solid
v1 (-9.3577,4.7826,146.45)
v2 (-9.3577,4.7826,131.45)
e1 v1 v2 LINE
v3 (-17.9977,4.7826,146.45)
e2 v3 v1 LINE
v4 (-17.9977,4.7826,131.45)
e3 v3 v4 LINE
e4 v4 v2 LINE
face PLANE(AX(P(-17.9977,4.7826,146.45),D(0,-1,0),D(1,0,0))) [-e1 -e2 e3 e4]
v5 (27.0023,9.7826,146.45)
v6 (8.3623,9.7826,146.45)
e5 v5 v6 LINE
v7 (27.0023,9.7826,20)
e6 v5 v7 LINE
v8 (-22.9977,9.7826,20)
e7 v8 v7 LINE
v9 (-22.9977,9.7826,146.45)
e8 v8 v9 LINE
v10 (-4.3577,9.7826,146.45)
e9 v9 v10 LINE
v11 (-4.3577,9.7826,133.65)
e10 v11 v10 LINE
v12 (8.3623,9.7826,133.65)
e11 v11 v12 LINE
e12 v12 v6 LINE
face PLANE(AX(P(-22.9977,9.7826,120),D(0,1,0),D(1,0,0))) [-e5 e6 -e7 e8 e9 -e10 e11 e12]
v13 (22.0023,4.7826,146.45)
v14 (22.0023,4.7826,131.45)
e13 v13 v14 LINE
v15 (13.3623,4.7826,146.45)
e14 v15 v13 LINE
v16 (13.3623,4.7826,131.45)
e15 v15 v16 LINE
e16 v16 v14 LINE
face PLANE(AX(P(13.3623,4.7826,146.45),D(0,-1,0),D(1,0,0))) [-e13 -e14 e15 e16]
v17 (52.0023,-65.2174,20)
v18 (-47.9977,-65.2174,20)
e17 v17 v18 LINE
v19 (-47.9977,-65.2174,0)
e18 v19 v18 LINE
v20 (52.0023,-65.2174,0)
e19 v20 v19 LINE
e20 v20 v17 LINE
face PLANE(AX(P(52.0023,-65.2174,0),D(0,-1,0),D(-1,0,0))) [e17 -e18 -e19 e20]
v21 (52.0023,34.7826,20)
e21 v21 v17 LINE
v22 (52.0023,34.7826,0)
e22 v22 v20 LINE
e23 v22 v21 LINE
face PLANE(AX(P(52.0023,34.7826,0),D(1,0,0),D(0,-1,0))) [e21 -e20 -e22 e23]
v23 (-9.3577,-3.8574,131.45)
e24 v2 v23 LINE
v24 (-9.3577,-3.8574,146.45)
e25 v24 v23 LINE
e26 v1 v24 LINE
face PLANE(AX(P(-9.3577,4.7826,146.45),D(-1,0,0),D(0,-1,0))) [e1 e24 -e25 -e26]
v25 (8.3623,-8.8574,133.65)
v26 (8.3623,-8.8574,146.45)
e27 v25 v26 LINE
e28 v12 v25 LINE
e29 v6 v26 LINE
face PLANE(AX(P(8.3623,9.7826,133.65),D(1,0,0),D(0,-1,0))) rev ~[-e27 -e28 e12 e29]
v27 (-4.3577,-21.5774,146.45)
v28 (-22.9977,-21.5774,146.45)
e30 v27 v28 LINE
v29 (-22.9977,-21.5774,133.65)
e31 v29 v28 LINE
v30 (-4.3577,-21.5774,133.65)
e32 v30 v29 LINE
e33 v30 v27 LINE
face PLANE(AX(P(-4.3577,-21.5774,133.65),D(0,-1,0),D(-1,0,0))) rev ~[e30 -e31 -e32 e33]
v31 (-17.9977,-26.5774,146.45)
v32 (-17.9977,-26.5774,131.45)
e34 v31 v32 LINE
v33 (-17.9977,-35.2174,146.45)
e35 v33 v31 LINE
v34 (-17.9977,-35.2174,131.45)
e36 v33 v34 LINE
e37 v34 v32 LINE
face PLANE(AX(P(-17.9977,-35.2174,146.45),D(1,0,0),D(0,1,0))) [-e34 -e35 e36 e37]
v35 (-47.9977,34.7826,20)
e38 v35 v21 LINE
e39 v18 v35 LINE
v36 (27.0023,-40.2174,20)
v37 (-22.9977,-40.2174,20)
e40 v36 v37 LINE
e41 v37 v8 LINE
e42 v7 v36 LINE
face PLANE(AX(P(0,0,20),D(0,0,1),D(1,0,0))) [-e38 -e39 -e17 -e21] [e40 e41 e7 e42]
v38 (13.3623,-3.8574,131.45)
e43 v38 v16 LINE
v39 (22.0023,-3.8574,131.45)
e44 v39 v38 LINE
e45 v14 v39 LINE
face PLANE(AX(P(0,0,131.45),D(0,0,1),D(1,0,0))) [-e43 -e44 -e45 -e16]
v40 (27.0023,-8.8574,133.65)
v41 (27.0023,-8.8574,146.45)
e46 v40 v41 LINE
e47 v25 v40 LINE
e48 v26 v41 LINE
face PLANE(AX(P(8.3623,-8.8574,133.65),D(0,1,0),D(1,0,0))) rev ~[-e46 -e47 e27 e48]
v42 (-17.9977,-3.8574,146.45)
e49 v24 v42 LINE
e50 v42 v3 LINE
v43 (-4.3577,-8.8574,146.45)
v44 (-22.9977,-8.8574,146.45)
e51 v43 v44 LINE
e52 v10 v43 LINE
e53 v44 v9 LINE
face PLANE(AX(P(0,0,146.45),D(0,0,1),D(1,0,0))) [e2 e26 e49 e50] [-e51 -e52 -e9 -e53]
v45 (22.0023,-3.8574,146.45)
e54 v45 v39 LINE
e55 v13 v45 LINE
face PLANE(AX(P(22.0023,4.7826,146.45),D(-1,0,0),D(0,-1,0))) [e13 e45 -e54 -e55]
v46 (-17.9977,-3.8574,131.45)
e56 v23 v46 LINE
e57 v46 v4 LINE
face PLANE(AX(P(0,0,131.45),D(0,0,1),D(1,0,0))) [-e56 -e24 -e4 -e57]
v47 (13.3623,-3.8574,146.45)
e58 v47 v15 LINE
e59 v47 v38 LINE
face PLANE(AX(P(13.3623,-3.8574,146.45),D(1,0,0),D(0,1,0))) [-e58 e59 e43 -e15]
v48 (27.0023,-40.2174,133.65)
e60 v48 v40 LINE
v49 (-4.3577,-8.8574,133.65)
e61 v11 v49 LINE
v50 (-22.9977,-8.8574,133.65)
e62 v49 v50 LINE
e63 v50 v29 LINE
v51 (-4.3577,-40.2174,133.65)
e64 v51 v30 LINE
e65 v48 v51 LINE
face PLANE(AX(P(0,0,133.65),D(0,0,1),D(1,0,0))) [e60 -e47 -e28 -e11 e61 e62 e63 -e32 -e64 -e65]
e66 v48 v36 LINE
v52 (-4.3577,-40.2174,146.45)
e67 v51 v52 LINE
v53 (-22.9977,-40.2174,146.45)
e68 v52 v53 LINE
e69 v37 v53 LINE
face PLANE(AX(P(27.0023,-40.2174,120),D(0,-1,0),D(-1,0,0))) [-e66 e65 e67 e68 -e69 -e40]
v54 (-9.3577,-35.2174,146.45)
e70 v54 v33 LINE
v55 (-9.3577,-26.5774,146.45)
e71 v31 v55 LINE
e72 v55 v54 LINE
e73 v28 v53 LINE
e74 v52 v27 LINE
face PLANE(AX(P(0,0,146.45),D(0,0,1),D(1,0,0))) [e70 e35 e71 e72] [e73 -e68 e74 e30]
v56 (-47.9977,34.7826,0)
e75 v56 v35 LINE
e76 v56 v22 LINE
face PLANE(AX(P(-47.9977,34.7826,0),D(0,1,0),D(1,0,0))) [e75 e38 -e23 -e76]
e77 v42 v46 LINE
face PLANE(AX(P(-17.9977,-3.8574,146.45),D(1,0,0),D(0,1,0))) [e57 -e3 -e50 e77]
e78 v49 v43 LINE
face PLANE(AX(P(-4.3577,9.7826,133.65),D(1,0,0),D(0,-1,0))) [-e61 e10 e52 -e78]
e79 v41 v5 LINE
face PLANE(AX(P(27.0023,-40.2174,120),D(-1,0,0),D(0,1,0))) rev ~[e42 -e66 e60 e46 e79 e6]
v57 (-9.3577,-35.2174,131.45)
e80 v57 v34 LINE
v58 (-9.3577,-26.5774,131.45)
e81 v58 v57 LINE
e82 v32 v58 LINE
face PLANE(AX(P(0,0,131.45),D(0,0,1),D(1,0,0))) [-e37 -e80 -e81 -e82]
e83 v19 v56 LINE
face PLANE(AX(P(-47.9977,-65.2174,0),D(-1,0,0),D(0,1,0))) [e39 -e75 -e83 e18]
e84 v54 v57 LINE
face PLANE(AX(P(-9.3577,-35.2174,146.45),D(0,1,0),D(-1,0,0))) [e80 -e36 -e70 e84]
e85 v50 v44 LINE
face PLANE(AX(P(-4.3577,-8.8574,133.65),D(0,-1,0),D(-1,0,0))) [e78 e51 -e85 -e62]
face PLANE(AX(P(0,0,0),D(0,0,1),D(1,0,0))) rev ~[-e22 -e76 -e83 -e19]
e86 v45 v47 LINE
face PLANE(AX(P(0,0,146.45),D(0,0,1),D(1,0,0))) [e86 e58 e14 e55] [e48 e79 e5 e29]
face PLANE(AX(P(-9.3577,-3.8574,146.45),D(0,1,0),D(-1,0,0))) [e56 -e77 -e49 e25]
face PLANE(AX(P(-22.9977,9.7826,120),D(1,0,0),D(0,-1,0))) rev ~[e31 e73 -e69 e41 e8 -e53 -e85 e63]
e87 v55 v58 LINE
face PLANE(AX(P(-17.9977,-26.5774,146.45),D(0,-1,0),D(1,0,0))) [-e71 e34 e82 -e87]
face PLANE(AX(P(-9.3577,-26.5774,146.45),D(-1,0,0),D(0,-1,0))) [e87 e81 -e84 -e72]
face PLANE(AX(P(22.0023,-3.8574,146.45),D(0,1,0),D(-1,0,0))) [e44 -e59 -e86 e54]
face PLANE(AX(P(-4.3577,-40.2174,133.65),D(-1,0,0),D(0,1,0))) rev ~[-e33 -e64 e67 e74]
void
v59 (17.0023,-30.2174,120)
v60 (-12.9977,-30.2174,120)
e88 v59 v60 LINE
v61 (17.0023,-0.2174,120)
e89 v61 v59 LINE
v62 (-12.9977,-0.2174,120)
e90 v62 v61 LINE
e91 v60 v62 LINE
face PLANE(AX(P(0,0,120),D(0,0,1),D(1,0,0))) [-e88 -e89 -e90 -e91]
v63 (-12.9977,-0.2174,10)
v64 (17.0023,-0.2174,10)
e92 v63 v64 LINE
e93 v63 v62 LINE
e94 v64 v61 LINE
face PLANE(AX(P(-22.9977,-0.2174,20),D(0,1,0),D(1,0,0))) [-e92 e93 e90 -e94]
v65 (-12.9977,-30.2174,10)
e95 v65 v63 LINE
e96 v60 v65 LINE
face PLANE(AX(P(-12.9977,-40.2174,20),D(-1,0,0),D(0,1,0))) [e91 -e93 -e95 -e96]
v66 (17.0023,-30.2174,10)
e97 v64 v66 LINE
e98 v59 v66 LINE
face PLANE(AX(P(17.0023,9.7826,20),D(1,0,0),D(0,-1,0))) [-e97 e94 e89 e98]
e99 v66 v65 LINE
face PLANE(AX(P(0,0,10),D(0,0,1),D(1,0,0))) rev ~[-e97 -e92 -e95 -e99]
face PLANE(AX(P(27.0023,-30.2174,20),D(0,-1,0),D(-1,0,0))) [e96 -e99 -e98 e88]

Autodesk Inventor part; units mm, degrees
ref_plane "YZ Plane" through (0, 0, 0) normal (1, 0, 0) x (0, 1, 0)
ref_plane "XZ Plane" through (0, 0, 0) normal (0, 1, 0) x (-1, 0, 0)
ref_plane "XY Plane" through (0, 0, 0) normal (0, 0, 1) x (1, 0, 0)
sketch "Sketch1" plane through (0, 0, 0) normal (0, 0, 1) x (1, 0, 0)
  line L0 (-47.9977, 34.7826) -> (52.0023, 34.7826)
  line L1 (52.0023, 34.7826) -> (52.0023, -65.2174)
  line L2 (52.0023, -65.2174) -> (-47.9977, -65.2174)
  line L3 (-47.9977, -65.2174) -> (-47.9977, 34.7826)
  point P0 (0, 0)
  dimension "d0" = 100
  dimension "d1" = 100
  dimension "d2" = 100
extrude "Extrusion1" add sketch "Sketch1" along normal blind 20
sketch "Sketch2" plane through (0, 0, 20) normal (0, 0, 1) x (1, 0, 0)
  line L0 (-22.9977, 9.7826) -> (27.0023, 9.7826)
  line L1 (27.0023, 9.7826) -> (27.0023, -40.2174)
  line L2 (27.0023, -40.2174) -> (-22.9977, -40.2174)
  line L3 (-22.9977, -40.2174) -> (-22.9977, 9.7826)
  line L4 (52.0023, 34.7826) -> (-47.9977, 34.7826) projected
  line L5 (-47.9977, 34.7826) -> (-47.9977, -65.2174) projected
  line L6 (-47.9977, -65.2174) -> (52.0023, -65.2174) projected
  line L7 (52.0023, -65.2174) -> (52.0023, 34.7826) projected
  point P0 (0, 0)
  dimension "d5" = 25
  dimension "d6" = 25
  dimension "d7" = 25
  dimension "d8" = 25
extrude "Extrusion2" add sketch "Sketch2" along normal blind 100 contours L0 L1 L2 L3
shell "Shell1" thickness 10 removed faces 1 at (-6.331, -6.8841, 120)
sketch "Sketch3" plane through (0, 0, 120) normal (0, 0, 1) x (1, 0, 0)
  line L0 (-22.9977, 9.7826) -> (-22.9977, -40.2174) projected
  line L1 (27.0023, -40.2174) -> (27.0023, 9.7826) projected
  line L2 (-22.9977, 9.7826) -> (27.0023, 9.7826)
  line L3 (27.0023, 9.7826) -> (27.0023, -40.2174)
  line L4 (27.0023, -40.2174) -> (-22.9977, -40.2174)
  line L5 (-22.9977, -40.2174) -> (-22.9977, 9.7826)
  point P0 (0, 0)
extrude "Extrusion3" add sketch "Sketch3" along normal blind 13.65
sketch "Sketch4" plane through (0, 0, 133.65) normal (0, 0, 1) x (1, 0, 0)
  line L0 (-22.9977, 9.7826) -> (-4.3577, 9.7826)
  line L1 (-4.3577, 9.7826) -> (-4.3577, -8.8574)
  line L2 (-4.3577, -8.8574) -> (-22.9977, -8.8574)
  line L3 (-22.9977, -8.8574) -> (-22.9977, 9.7826)
  line L4 (27.0023, 9.7826) -> (8.3623, 9.7826)
  line L5 (8.3623, 9.7826) -> (8.3623, -8.8574)
  line L6 (8.3623, -8.8574) -> (27.0023, -8.8574)
  line L7 (27.0023, -8.8574) -> (27.0023, 9.7826)
  line L8 (27.0023, -40.2174) -> (-22.9977, -40.2174) projected
  line L9 (-22.9977, -40.2174) -> (-4.3577, -40.2174)
  line L10 (-4.3577, -40.2174) -> (-4.3577, -21.5774)
  line L11 (-4.3577, -21.5774) -> (-22.9977, -21.5774)
  line L12 (-22.9977, -21.5774) -> (-22.9977, -40.2174)
  point P0 (0, 0)
  dimension "d14" = 18.64
  dimension "d15" = 18.64
  dimension "d16" = 18.64
  dimension "d17" = 18.64
  dimension "d18" = 18.64
extrude "Extrusion4" add sketch "Sketch4" along normal blind 12.8
sketch "Sketch5" plane through (0, 0, 146.45) normal (0, 0, 1) x (1, 0, 0)
  line L0 (13.3623, 4.7826) -> (22.0023, 4.7826)
  line L1 (22.0023, 4.7826) -> (22.0023, -3.8574)
  line L2 (22.0023, -3.8574) -> (13.3623, -3.8574)
  line L3 (13.3623, -3.8574) -> (13.3623, 4.7826)
  line L4 (-17.9977, 4.7826) -> (-9.3577, 4.7826)
  line L5 (-9.3577, 4.7826) -> (-9.3577, -3.8574)
  line L6 (-9.3577, -3.8574) -> (-17.9977, -3.8574)
  line L7 (-17.9977, -3.8574) -> (-17.9977, 4.7826)
  line L8 (-17.9977, -26.5774) -> (-9.3577, -26.5774)
  line L9 (-9.3577, -26.5774) -> (-9.3577, -35.2174)
  line L10 (-9.3577, -35.2174) -> (-17.9977, -35.2174)
  line L11 (-17.9977, -35.2174) -> (-17.9977, -26.5774)
  line L12 (-4.3577, 9.7826) -> (-22.9977, 9.7826) projected
  line L13 (-22.9977, 9.7826) -> (-22.9977, -8.8574) projected
  line L14 (-22.9977, -8.8574) -> (-4.3577, -8.8574) projected
  line L15 (-4.3577, -8.8574) -> (-4.3577, 9.7826) projected
  line L16 (27.0023, 9.7826) -> (8.3623, 9.7826) projected
  line L17 (27.0023, -8.8574) -> (27.0023, 9.7826) projected
  line L18 (8.3623, 9.7826) -> (8.3623, -8.8574) projected
  line L19 (-4.3577, -21.5774) -> (-22.9977, -21.5774) projected
  line L20 (-22.9977, -40.2174) -> (-4.3577, -40.2174) projected
  point P0 (0, 0)
  dimension "d21" = 5
  dimension "d22" = 5
  dimension "d23" = 5
  dimension "d24" = 5
  dimension "d25" = 5
  dimension "d26" = 5
  dimension "d27" = 5
  dimension "d28" = 5
  dimension "d29" = 5
extrude "Extrusion5" cut sketch "Sketch5" against normal blind 15 contours L0 L1 L2 L3 | L4 L5 L6 L7 | L8 L9 L10 L11
equation "\"d1\" = d0"
equation "\"d6\" = d5"
equation "\"d7\" = d5"
equation "\"d8\" = d5"
equation "\"d15\" = d14"
equation "\"d16\" = d14"
equation "\"d18\" = d14"
equation "\"d22\" = d21"
equation "\"d23\" = d21"
equation "\"d24\" = d21"
equation "\"d26\" = d21"
equation "\"d27\" = d21"
equation "\"d28\" = d21"
equation "\"d29\" = d21"
properties part number "final_beam_cube"
